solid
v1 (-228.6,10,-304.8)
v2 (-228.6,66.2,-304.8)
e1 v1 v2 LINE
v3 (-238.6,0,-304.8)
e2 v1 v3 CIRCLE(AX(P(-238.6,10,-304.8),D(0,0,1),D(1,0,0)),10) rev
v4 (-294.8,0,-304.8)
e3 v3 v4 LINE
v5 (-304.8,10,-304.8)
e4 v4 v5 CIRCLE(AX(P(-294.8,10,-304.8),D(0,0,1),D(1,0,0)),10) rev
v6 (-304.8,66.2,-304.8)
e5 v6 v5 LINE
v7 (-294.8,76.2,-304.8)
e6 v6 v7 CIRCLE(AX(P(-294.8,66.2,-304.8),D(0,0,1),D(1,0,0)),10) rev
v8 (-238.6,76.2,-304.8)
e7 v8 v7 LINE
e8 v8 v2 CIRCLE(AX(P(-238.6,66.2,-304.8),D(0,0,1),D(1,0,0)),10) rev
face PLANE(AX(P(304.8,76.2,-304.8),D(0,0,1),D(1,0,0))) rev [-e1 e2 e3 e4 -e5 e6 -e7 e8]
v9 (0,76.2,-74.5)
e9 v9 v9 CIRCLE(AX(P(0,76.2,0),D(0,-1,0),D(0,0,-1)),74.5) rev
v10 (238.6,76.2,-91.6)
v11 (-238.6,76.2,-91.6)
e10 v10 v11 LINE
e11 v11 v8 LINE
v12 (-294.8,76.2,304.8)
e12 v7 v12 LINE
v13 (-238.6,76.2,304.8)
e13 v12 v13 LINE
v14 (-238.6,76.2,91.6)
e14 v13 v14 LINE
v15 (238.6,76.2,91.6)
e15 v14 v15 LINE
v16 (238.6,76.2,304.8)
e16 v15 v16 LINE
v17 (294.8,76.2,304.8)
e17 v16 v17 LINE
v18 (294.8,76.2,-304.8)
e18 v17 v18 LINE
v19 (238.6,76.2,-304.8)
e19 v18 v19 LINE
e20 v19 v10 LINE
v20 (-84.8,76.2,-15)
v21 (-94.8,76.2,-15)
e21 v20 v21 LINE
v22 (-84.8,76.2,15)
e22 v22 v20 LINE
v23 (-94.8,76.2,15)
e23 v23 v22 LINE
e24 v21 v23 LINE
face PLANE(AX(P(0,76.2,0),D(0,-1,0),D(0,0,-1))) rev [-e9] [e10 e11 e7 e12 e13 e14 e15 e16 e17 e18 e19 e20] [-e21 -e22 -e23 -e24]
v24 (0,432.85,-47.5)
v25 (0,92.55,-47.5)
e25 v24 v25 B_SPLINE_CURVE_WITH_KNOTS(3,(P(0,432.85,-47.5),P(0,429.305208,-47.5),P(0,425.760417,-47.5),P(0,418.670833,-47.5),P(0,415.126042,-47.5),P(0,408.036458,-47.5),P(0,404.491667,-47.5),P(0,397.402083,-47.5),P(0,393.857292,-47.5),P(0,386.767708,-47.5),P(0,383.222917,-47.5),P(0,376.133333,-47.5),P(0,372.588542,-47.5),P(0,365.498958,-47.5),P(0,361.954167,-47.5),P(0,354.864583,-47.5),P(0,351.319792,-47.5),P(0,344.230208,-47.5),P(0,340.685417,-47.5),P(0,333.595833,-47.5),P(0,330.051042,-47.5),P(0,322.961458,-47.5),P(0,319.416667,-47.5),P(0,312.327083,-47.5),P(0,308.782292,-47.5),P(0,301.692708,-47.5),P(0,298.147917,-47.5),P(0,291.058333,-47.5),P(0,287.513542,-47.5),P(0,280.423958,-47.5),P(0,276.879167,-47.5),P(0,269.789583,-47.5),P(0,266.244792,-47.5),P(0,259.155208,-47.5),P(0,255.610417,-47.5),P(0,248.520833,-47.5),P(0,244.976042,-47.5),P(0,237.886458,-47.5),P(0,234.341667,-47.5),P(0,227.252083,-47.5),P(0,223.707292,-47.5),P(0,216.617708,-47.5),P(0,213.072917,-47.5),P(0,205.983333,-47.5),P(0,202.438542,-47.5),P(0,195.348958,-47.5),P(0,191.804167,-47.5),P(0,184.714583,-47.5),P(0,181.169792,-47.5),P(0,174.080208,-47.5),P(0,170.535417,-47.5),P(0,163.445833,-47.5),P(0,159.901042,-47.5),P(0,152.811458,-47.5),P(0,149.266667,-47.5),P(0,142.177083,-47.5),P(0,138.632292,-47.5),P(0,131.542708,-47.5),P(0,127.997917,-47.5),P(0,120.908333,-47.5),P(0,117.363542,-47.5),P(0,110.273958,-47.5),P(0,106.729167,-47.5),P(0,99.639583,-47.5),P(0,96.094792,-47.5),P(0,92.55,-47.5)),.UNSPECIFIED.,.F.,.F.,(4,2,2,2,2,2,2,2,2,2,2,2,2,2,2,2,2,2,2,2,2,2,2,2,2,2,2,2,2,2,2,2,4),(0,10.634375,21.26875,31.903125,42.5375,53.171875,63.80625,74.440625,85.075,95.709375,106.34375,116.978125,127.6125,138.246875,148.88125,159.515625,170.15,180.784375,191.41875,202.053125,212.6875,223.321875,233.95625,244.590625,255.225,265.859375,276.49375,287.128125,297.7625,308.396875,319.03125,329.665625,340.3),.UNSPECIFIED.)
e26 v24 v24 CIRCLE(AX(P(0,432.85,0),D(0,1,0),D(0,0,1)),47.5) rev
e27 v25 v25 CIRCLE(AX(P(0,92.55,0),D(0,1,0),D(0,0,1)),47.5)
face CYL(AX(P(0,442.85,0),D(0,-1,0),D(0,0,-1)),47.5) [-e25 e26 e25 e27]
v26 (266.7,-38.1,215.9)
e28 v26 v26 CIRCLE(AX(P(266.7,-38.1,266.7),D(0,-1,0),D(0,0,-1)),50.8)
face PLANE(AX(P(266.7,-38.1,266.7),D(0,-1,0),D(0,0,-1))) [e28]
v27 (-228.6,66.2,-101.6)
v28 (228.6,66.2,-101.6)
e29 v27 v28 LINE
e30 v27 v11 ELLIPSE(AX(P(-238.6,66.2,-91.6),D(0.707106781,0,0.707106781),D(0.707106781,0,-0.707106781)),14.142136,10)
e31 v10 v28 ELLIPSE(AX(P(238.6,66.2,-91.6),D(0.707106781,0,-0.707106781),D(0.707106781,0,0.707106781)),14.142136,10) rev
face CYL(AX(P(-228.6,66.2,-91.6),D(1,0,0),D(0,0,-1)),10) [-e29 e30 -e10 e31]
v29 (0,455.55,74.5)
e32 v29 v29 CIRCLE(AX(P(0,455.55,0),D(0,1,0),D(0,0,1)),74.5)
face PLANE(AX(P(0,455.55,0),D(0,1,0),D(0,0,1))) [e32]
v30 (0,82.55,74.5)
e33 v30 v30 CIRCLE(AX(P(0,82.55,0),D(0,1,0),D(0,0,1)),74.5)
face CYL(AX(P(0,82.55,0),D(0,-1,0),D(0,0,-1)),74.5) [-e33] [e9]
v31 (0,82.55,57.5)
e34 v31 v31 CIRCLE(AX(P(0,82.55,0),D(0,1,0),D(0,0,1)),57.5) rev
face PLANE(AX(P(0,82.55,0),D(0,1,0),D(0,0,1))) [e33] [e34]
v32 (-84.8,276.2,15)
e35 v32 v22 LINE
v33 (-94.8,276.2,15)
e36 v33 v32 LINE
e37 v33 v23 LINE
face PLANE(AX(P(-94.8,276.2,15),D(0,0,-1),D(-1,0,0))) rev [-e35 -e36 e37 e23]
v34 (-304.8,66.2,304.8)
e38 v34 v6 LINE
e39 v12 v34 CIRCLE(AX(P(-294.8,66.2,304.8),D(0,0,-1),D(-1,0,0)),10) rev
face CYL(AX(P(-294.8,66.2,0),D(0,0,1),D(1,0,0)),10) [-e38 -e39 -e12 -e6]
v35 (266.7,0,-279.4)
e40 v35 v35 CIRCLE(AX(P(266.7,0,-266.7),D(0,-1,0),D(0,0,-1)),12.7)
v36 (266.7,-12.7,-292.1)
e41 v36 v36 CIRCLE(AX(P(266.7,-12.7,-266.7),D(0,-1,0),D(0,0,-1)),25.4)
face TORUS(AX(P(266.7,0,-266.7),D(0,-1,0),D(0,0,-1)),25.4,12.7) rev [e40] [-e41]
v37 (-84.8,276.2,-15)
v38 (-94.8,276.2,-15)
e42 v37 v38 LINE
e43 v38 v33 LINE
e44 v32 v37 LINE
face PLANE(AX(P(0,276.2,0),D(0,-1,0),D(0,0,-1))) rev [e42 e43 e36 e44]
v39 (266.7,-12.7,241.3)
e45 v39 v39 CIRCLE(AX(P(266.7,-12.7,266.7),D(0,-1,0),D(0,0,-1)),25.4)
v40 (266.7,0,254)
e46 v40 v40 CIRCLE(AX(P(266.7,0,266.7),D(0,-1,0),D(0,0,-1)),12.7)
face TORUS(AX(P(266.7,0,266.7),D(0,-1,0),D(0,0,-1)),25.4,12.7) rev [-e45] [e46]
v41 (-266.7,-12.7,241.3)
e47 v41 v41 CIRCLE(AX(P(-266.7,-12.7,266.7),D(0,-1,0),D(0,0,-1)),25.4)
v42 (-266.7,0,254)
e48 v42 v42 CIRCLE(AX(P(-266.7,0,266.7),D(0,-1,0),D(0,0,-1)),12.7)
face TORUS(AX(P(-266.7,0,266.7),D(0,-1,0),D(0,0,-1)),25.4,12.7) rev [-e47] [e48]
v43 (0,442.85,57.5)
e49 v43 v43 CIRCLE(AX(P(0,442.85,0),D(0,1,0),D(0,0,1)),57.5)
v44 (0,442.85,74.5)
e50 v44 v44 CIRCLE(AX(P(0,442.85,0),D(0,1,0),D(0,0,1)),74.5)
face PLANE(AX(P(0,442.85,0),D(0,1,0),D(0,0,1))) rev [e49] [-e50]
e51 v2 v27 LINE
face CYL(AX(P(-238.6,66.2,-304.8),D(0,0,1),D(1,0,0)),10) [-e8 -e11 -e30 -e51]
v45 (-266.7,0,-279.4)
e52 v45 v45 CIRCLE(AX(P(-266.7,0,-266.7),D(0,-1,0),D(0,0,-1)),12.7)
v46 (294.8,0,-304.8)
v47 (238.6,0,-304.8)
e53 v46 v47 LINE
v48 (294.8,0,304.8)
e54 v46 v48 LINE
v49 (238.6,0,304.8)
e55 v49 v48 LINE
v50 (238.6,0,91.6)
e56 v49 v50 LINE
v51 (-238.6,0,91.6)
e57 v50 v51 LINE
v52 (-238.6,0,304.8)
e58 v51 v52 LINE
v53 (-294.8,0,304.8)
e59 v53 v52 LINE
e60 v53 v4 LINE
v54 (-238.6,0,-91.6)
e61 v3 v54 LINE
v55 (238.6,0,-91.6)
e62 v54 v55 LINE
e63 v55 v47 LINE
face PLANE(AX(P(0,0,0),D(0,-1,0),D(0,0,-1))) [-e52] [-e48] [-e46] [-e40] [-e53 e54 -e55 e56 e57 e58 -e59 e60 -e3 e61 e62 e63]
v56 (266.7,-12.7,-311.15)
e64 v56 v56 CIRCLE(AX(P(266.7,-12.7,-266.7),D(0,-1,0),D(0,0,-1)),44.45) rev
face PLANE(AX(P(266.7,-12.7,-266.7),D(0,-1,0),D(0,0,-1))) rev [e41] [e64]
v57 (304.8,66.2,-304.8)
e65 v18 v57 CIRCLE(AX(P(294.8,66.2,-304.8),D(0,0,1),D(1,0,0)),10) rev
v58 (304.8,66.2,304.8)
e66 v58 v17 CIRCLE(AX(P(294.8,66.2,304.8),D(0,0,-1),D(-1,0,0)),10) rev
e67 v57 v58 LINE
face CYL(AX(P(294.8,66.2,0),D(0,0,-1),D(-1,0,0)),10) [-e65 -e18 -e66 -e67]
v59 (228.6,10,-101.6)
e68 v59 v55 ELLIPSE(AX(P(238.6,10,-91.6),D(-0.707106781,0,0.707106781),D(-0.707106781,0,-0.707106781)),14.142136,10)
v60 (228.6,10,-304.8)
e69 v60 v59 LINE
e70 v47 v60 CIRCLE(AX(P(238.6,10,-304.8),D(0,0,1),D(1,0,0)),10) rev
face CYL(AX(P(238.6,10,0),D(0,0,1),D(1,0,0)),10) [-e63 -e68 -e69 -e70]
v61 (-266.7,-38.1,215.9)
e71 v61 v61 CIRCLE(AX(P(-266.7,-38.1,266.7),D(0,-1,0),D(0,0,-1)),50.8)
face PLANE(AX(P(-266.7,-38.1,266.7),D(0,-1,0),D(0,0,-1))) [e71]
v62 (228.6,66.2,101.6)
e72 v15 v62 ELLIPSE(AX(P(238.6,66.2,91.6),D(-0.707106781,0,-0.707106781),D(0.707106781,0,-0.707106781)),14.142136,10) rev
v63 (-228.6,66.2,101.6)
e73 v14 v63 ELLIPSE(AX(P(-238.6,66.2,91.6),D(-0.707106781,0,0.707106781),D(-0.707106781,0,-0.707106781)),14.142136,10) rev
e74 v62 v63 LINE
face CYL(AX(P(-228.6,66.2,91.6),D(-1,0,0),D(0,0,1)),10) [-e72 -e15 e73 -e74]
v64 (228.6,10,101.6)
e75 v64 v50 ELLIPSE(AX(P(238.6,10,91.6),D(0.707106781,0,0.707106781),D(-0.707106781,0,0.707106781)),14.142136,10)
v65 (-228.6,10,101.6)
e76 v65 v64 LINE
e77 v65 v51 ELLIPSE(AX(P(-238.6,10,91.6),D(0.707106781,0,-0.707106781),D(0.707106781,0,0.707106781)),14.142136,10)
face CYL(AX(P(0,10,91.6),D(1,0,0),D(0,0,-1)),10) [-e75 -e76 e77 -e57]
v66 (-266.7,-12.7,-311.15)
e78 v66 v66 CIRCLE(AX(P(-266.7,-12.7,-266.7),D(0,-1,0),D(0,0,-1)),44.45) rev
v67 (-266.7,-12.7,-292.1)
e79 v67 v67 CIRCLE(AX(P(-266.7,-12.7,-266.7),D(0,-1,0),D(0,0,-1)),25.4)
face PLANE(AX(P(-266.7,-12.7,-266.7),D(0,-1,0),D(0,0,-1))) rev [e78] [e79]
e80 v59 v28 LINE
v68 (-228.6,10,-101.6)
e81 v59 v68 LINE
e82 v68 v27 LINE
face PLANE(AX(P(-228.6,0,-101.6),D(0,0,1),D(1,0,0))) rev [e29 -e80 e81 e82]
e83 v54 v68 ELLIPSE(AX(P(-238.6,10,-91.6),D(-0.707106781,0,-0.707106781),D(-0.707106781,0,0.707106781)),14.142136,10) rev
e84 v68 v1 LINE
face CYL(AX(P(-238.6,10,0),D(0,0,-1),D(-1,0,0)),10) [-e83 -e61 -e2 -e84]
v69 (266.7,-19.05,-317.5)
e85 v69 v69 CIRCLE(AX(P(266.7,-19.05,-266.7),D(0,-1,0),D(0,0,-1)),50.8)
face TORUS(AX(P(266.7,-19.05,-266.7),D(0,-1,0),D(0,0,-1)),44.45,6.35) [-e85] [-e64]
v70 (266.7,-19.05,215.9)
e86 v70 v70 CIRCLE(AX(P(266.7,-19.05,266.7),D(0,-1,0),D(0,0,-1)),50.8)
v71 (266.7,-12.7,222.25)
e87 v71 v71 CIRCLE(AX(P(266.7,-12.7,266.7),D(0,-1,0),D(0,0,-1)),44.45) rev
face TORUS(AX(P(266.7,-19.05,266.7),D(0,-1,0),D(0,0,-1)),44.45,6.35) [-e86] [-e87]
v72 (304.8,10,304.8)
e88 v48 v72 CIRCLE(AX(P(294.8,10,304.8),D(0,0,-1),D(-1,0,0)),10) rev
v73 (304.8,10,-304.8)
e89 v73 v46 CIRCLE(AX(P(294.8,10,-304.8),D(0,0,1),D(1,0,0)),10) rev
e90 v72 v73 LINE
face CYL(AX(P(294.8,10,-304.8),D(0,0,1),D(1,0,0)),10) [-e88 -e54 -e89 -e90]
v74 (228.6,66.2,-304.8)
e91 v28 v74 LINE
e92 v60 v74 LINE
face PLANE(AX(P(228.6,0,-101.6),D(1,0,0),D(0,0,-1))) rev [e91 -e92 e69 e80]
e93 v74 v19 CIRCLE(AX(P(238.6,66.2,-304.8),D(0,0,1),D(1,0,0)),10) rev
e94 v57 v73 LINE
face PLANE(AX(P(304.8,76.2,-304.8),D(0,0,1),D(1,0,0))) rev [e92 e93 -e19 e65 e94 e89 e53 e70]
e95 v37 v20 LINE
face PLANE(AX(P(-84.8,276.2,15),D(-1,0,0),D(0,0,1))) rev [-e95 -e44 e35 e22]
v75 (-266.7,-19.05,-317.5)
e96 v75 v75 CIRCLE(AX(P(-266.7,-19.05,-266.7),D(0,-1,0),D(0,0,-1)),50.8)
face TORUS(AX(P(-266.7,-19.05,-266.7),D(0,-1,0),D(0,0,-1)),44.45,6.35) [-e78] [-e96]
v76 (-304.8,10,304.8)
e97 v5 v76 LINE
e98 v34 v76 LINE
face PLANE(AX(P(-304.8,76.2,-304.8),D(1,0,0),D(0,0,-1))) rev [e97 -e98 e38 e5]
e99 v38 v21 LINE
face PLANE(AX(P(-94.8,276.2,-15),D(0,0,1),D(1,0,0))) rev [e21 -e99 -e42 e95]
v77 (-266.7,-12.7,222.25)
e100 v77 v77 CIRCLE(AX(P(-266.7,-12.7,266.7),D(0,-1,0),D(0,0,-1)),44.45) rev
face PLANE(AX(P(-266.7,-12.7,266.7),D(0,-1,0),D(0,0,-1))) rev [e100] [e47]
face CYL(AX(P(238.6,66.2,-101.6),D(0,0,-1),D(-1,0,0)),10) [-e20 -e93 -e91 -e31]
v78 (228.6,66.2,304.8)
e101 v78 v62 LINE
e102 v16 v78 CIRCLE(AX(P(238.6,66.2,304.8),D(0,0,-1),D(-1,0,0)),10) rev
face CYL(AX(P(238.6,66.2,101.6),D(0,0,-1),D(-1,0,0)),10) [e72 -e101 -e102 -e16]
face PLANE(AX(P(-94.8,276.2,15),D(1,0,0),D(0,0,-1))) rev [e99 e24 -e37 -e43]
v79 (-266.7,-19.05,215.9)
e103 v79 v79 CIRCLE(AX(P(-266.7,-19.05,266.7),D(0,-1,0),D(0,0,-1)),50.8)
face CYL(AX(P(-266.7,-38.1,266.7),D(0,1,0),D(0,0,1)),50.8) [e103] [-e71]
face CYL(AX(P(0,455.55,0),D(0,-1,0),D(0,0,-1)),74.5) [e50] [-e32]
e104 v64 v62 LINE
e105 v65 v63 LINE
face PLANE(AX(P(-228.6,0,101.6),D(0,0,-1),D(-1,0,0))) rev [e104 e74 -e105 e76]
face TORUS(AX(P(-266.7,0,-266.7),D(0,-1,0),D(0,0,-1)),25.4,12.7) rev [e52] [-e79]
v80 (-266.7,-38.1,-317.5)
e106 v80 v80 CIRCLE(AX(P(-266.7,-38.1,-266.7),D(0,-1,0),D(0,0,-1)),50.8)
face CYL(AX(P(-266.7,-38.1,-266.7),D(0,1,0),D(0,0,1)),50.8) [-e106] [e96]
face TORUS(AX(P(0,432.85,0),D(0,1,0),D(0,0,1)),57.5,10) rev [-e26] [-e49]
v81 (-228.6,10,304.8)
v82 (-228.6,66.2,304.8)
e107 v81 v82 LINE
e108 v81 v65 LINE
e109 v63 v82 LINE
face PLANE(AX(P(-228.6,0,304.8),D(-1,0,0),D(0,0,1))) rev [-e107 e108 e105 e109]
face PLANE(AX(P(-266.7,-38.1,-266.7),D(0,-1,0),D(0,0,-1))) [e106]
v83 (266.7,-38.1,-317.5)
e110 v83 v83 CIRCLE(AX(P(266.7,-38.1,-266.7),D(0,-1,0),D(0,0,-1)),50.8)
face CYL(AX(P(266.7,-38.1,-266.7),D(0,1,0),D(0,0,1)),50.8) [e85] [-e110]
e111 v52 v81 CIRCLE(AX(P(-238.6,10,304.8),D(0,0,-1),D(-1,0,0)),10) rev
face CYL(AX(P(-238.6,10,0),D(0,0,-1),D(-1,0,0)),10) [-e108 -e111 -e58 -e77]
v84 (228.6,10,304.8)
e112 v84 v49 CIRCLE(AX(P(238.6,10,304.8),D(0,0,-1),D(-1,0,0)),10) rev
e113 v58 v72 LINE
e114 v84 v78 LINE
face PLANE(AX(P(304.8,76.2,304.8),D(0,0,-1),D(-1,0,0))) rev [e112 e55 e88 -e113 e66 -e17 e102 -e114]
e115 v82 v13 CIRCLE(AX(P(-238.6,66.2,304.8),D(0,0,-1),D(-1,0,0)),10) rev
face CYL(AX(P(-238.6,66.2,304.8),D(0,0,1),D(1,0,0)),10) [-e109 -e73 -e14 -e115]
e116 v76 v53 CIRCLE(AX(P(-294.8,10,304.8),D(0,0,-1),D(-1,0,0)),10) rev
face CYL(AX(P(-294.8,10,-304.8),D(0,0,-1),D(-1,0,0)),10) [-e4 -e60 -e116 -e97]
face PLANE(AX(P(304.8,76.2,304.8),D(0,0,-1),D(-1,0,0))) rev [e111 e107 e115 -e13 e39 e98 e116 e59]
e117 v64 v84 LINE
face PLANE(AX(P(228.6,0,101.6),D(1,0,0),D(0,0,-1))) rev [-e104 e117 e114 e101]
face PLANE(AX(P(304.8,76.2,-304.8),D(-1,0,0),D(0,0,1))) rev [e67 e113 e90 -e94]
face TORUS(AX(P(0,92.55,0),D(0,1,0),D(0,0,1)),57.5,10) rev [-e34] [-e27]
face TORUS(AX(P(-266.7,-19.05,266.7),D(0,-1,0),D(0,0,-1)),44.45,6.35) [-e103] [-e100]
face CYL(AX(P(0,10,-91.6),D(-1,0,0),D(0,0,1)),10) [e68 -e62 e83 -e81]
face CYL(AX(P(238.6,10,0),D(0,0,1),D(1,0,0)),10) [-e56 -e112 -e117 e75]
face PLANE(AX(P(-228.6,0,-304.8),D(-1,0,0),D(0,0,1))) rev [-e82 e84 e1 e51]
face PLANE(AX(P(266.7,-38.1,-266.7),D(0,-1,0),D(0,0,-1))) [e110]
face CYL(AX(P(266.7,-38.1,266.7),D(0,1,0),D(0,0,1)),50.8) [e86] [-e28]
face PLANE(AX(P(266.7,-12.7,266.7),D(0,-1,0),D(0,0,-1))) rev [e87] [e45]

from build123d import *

# Parameters (mm, degrees)
SKETCH1_W           = 609.6
SKETCH1_H           = 609.6
BOSS_EXTRUDE1_DEPTH = 76.2
SKETCH2_W           = 457.2
SKETCH2_H           = 203.2
CUT_EXTRUDE1_DEPTH  = 438.735673666
FILLET1_R           = 10
SKETCH4_R           = 12.7
BOSS_EXTRUDE2_DEPTH = 12.7
SKETCH5_R           = 50.8
BOSS_EXTRUDE3_DEPTH = 25.4
FILLET3_R           = 12.7
FILLET4_R           = 6.35
SKETCH6_R           = 74.5
BOSS_EXTRUDE4_DEPTH = 6.35
SKETCH7_R           = 47.5
BOSS_EXTRUDE5_DEPTH = 360.3
SKETCH8_R           = 74.5
BOSS_EXTRUDE6_DEPTH = 12.7
FILLET5_R           = 10
SKETCH9_W           = 10
SKETCH9_H           = 30
BOSS_EXTRUDE7_DEPTH = 200


with BuildPart() as part:
    # Sketch1 → Boss-Extrude1 (new body)
    with BuildSketch(Plane(origin=(0, 0, 0), x_dir=(1, 0, 0), z_dir=(0, 1, 0))):
        Rectangle(SKETCH1_W, SKETCH1_H)
    extrude(amount=BOSS_EXTRUDE1_DEPTH)

    # Sketch2 → Cut-Extrude1 (cut, through all)
    with BuildSketch(Plane(origin=(0, 76.2, 0), x_dir=(1, 0, 0), z_dir=(0, 1, 0))):
        with Locations((0, -203.2)):
            Rectangle(SKETCH2_W, SKETCH2_H)
        with Locations((0, 203.2)):
            Rectangle(SKETCH2_W, SKETCH2_H)
    extrude(amount=-CUT_EXTRUDE1_DEPTH, mode=Mode.SUBTRACT)

    # Fillet1
    fillet1_edges = [part.edges().sort_by_distance(p)[0] for p in [
        (304.8, 76.2, 0),
        (-228.6, 0, 203.2),
        (0, 0, 101.6),
        (228.6, 0, 203.2),
        (228.6, 76.2, 203.2),
        (0, 76.2, 101.6),
        (-228.6, 76.2, 203.2),
        (0, 0, -101.6),
        (-228.6, 0, -203.2),
        (228.6, 0, -203.2),
        (0, 76.2, -101.6),
        (228.6, 76.2, -203.2),
        (-228.6, 76.2, -203.2),
        (-304.8, 76.2, 0),
        (304.8, 0, 0),
        (-304.8, 0, 0),
    ]]
    fillet(fillet1_edges, radius=FILLET1_R)

    # Sketch4 → Boss-Extrude2 (add)
    with BuildSketch(Plane.XZ):
        with Locations(Location((-266.7, 266.7, 0), (0, 0, 270))):
            Circle(SKETCH4_R)
        with Locations(Location((266.7, 266.7, 0), (0, 0, 270))):
            Circle(SKETCH4_R)
        with Locations(Location((266.7, -266.7, 0), (0, 0, 270))):
            Circle(SKETCH4_R)
        with Locations(Location((-266.7, -266.7, 0), (0, 0, 270))):
            Circle(SKETCH4_R)
    extrude(amount=BOSS_EXTRUDE2_DEPTH)

    # Sketch5 → Boss-Extrude3 (add)
    with BuildSketch(Plane.XZ.offset(12.7)):
        with Locations(Location((-266.7, 266.7, 0), (0, 0, 270))):
            Circle(SKETCH5_R)
        with Locations(Location((266.7, 266.7, 0), (0, 0, 270))):
            Circle(SKETCH5_R)
        with Locations(Location((266.7, -266.7, 0), (0, 0, 270))):
            Circle(SKETCH5_R)
        with Locations(Location((-266.7, -266.7, 0), (0, 0, 270))):
            Circle(SKETCH5_R)
    extrude(amount=BOSS_EXTRUDE3_DEPTH)

    # Fillet3
    fillet3_edges = [part.edges().sort_by_distance(p)[0] for p in [
        (-266.7, -12.7, 279.4),
        (266.7, -12.7, 279.4),
        (266.7, -12.7, -254),
        (-266.7, -12.7, -254),
    ]]
    fillet(fillet3_edges, radius=FILLET3_R - 0.0001)  # a hair under: the kernel refuses the full size

    # Fillet4
    fillet4_edges = [part.edges().sort_by_distance(p)[0] for p in [
        (-266.7, -12.7, 317.5),
        (266.7, -12.7, 317.5),
        (266.7, -12.7, -215.9),
        (-266.7, -12.7, -215.9),
    ]]
    fillet(fillet4_edges, radius=FILLET4_R)

    # Sketch6 → Boss-Extrude4 (add)
    with BuildSketch(Plane(origin=(0, 76.2, 0), x_dir=(1, 0, 0), z_dir=(0, 1, 0))):
        with Locations(Location((0, 0, 0), (0, 0, 90))):
            Circle(SKETCH6_R)
    extrude(amount=BOSS_EXTRUDE4_DEPTH)

    # Sketch7 → Boss-Extrude5 (add)
    with BuildSketch(Plane(origin=(0, 82.55, 0), x_dir=(1, 0, 0), z_dir=(0, 1, 0))):
        with Locations(Location((0, 0, 0), (0, 0, 90))):
            Circle(SKETCH7_R)
    extrude(amount=BOSS_EXTRUDE5_DEPTH)

    # Sketch8 → Boss-Extrude6 (add)
    with BuildSketch(Plane(origin=(0, 442.85, 0), x_dir=(1, 0, 0), z_dir=(0, 1, 0))):
        with Locations(Location((0, 0, 0), (0, 0, 90))):
            Circle(SKETCH8_R)
    extrude(amount=BOSS_EXTRUDE6_DEPTH)

    # Fillet5
    fillet5_edges = [part.edges().sort_by_distance(p)[0] for p in [
        (0, 82.55, 47.5),
        (0, 442.85, 47.5),
    ]]
    fillet(fillet5_edges, radius=FILLET5_R)

    # Sketch9 → Boss-Extrude7 (add)
    with BuildSketch(Plane(origin=(0, 76.2, 0), x_dir=(1, 0, 0), z_dir=(0, 1, 0))):
        with Locations((-89.8, 0)):
            Rectangle(SKETCH9_W, SKETCH9_H)
    extrude(amount=BOSS_EXTRUDE7_DEPTH)


solid = part.part
